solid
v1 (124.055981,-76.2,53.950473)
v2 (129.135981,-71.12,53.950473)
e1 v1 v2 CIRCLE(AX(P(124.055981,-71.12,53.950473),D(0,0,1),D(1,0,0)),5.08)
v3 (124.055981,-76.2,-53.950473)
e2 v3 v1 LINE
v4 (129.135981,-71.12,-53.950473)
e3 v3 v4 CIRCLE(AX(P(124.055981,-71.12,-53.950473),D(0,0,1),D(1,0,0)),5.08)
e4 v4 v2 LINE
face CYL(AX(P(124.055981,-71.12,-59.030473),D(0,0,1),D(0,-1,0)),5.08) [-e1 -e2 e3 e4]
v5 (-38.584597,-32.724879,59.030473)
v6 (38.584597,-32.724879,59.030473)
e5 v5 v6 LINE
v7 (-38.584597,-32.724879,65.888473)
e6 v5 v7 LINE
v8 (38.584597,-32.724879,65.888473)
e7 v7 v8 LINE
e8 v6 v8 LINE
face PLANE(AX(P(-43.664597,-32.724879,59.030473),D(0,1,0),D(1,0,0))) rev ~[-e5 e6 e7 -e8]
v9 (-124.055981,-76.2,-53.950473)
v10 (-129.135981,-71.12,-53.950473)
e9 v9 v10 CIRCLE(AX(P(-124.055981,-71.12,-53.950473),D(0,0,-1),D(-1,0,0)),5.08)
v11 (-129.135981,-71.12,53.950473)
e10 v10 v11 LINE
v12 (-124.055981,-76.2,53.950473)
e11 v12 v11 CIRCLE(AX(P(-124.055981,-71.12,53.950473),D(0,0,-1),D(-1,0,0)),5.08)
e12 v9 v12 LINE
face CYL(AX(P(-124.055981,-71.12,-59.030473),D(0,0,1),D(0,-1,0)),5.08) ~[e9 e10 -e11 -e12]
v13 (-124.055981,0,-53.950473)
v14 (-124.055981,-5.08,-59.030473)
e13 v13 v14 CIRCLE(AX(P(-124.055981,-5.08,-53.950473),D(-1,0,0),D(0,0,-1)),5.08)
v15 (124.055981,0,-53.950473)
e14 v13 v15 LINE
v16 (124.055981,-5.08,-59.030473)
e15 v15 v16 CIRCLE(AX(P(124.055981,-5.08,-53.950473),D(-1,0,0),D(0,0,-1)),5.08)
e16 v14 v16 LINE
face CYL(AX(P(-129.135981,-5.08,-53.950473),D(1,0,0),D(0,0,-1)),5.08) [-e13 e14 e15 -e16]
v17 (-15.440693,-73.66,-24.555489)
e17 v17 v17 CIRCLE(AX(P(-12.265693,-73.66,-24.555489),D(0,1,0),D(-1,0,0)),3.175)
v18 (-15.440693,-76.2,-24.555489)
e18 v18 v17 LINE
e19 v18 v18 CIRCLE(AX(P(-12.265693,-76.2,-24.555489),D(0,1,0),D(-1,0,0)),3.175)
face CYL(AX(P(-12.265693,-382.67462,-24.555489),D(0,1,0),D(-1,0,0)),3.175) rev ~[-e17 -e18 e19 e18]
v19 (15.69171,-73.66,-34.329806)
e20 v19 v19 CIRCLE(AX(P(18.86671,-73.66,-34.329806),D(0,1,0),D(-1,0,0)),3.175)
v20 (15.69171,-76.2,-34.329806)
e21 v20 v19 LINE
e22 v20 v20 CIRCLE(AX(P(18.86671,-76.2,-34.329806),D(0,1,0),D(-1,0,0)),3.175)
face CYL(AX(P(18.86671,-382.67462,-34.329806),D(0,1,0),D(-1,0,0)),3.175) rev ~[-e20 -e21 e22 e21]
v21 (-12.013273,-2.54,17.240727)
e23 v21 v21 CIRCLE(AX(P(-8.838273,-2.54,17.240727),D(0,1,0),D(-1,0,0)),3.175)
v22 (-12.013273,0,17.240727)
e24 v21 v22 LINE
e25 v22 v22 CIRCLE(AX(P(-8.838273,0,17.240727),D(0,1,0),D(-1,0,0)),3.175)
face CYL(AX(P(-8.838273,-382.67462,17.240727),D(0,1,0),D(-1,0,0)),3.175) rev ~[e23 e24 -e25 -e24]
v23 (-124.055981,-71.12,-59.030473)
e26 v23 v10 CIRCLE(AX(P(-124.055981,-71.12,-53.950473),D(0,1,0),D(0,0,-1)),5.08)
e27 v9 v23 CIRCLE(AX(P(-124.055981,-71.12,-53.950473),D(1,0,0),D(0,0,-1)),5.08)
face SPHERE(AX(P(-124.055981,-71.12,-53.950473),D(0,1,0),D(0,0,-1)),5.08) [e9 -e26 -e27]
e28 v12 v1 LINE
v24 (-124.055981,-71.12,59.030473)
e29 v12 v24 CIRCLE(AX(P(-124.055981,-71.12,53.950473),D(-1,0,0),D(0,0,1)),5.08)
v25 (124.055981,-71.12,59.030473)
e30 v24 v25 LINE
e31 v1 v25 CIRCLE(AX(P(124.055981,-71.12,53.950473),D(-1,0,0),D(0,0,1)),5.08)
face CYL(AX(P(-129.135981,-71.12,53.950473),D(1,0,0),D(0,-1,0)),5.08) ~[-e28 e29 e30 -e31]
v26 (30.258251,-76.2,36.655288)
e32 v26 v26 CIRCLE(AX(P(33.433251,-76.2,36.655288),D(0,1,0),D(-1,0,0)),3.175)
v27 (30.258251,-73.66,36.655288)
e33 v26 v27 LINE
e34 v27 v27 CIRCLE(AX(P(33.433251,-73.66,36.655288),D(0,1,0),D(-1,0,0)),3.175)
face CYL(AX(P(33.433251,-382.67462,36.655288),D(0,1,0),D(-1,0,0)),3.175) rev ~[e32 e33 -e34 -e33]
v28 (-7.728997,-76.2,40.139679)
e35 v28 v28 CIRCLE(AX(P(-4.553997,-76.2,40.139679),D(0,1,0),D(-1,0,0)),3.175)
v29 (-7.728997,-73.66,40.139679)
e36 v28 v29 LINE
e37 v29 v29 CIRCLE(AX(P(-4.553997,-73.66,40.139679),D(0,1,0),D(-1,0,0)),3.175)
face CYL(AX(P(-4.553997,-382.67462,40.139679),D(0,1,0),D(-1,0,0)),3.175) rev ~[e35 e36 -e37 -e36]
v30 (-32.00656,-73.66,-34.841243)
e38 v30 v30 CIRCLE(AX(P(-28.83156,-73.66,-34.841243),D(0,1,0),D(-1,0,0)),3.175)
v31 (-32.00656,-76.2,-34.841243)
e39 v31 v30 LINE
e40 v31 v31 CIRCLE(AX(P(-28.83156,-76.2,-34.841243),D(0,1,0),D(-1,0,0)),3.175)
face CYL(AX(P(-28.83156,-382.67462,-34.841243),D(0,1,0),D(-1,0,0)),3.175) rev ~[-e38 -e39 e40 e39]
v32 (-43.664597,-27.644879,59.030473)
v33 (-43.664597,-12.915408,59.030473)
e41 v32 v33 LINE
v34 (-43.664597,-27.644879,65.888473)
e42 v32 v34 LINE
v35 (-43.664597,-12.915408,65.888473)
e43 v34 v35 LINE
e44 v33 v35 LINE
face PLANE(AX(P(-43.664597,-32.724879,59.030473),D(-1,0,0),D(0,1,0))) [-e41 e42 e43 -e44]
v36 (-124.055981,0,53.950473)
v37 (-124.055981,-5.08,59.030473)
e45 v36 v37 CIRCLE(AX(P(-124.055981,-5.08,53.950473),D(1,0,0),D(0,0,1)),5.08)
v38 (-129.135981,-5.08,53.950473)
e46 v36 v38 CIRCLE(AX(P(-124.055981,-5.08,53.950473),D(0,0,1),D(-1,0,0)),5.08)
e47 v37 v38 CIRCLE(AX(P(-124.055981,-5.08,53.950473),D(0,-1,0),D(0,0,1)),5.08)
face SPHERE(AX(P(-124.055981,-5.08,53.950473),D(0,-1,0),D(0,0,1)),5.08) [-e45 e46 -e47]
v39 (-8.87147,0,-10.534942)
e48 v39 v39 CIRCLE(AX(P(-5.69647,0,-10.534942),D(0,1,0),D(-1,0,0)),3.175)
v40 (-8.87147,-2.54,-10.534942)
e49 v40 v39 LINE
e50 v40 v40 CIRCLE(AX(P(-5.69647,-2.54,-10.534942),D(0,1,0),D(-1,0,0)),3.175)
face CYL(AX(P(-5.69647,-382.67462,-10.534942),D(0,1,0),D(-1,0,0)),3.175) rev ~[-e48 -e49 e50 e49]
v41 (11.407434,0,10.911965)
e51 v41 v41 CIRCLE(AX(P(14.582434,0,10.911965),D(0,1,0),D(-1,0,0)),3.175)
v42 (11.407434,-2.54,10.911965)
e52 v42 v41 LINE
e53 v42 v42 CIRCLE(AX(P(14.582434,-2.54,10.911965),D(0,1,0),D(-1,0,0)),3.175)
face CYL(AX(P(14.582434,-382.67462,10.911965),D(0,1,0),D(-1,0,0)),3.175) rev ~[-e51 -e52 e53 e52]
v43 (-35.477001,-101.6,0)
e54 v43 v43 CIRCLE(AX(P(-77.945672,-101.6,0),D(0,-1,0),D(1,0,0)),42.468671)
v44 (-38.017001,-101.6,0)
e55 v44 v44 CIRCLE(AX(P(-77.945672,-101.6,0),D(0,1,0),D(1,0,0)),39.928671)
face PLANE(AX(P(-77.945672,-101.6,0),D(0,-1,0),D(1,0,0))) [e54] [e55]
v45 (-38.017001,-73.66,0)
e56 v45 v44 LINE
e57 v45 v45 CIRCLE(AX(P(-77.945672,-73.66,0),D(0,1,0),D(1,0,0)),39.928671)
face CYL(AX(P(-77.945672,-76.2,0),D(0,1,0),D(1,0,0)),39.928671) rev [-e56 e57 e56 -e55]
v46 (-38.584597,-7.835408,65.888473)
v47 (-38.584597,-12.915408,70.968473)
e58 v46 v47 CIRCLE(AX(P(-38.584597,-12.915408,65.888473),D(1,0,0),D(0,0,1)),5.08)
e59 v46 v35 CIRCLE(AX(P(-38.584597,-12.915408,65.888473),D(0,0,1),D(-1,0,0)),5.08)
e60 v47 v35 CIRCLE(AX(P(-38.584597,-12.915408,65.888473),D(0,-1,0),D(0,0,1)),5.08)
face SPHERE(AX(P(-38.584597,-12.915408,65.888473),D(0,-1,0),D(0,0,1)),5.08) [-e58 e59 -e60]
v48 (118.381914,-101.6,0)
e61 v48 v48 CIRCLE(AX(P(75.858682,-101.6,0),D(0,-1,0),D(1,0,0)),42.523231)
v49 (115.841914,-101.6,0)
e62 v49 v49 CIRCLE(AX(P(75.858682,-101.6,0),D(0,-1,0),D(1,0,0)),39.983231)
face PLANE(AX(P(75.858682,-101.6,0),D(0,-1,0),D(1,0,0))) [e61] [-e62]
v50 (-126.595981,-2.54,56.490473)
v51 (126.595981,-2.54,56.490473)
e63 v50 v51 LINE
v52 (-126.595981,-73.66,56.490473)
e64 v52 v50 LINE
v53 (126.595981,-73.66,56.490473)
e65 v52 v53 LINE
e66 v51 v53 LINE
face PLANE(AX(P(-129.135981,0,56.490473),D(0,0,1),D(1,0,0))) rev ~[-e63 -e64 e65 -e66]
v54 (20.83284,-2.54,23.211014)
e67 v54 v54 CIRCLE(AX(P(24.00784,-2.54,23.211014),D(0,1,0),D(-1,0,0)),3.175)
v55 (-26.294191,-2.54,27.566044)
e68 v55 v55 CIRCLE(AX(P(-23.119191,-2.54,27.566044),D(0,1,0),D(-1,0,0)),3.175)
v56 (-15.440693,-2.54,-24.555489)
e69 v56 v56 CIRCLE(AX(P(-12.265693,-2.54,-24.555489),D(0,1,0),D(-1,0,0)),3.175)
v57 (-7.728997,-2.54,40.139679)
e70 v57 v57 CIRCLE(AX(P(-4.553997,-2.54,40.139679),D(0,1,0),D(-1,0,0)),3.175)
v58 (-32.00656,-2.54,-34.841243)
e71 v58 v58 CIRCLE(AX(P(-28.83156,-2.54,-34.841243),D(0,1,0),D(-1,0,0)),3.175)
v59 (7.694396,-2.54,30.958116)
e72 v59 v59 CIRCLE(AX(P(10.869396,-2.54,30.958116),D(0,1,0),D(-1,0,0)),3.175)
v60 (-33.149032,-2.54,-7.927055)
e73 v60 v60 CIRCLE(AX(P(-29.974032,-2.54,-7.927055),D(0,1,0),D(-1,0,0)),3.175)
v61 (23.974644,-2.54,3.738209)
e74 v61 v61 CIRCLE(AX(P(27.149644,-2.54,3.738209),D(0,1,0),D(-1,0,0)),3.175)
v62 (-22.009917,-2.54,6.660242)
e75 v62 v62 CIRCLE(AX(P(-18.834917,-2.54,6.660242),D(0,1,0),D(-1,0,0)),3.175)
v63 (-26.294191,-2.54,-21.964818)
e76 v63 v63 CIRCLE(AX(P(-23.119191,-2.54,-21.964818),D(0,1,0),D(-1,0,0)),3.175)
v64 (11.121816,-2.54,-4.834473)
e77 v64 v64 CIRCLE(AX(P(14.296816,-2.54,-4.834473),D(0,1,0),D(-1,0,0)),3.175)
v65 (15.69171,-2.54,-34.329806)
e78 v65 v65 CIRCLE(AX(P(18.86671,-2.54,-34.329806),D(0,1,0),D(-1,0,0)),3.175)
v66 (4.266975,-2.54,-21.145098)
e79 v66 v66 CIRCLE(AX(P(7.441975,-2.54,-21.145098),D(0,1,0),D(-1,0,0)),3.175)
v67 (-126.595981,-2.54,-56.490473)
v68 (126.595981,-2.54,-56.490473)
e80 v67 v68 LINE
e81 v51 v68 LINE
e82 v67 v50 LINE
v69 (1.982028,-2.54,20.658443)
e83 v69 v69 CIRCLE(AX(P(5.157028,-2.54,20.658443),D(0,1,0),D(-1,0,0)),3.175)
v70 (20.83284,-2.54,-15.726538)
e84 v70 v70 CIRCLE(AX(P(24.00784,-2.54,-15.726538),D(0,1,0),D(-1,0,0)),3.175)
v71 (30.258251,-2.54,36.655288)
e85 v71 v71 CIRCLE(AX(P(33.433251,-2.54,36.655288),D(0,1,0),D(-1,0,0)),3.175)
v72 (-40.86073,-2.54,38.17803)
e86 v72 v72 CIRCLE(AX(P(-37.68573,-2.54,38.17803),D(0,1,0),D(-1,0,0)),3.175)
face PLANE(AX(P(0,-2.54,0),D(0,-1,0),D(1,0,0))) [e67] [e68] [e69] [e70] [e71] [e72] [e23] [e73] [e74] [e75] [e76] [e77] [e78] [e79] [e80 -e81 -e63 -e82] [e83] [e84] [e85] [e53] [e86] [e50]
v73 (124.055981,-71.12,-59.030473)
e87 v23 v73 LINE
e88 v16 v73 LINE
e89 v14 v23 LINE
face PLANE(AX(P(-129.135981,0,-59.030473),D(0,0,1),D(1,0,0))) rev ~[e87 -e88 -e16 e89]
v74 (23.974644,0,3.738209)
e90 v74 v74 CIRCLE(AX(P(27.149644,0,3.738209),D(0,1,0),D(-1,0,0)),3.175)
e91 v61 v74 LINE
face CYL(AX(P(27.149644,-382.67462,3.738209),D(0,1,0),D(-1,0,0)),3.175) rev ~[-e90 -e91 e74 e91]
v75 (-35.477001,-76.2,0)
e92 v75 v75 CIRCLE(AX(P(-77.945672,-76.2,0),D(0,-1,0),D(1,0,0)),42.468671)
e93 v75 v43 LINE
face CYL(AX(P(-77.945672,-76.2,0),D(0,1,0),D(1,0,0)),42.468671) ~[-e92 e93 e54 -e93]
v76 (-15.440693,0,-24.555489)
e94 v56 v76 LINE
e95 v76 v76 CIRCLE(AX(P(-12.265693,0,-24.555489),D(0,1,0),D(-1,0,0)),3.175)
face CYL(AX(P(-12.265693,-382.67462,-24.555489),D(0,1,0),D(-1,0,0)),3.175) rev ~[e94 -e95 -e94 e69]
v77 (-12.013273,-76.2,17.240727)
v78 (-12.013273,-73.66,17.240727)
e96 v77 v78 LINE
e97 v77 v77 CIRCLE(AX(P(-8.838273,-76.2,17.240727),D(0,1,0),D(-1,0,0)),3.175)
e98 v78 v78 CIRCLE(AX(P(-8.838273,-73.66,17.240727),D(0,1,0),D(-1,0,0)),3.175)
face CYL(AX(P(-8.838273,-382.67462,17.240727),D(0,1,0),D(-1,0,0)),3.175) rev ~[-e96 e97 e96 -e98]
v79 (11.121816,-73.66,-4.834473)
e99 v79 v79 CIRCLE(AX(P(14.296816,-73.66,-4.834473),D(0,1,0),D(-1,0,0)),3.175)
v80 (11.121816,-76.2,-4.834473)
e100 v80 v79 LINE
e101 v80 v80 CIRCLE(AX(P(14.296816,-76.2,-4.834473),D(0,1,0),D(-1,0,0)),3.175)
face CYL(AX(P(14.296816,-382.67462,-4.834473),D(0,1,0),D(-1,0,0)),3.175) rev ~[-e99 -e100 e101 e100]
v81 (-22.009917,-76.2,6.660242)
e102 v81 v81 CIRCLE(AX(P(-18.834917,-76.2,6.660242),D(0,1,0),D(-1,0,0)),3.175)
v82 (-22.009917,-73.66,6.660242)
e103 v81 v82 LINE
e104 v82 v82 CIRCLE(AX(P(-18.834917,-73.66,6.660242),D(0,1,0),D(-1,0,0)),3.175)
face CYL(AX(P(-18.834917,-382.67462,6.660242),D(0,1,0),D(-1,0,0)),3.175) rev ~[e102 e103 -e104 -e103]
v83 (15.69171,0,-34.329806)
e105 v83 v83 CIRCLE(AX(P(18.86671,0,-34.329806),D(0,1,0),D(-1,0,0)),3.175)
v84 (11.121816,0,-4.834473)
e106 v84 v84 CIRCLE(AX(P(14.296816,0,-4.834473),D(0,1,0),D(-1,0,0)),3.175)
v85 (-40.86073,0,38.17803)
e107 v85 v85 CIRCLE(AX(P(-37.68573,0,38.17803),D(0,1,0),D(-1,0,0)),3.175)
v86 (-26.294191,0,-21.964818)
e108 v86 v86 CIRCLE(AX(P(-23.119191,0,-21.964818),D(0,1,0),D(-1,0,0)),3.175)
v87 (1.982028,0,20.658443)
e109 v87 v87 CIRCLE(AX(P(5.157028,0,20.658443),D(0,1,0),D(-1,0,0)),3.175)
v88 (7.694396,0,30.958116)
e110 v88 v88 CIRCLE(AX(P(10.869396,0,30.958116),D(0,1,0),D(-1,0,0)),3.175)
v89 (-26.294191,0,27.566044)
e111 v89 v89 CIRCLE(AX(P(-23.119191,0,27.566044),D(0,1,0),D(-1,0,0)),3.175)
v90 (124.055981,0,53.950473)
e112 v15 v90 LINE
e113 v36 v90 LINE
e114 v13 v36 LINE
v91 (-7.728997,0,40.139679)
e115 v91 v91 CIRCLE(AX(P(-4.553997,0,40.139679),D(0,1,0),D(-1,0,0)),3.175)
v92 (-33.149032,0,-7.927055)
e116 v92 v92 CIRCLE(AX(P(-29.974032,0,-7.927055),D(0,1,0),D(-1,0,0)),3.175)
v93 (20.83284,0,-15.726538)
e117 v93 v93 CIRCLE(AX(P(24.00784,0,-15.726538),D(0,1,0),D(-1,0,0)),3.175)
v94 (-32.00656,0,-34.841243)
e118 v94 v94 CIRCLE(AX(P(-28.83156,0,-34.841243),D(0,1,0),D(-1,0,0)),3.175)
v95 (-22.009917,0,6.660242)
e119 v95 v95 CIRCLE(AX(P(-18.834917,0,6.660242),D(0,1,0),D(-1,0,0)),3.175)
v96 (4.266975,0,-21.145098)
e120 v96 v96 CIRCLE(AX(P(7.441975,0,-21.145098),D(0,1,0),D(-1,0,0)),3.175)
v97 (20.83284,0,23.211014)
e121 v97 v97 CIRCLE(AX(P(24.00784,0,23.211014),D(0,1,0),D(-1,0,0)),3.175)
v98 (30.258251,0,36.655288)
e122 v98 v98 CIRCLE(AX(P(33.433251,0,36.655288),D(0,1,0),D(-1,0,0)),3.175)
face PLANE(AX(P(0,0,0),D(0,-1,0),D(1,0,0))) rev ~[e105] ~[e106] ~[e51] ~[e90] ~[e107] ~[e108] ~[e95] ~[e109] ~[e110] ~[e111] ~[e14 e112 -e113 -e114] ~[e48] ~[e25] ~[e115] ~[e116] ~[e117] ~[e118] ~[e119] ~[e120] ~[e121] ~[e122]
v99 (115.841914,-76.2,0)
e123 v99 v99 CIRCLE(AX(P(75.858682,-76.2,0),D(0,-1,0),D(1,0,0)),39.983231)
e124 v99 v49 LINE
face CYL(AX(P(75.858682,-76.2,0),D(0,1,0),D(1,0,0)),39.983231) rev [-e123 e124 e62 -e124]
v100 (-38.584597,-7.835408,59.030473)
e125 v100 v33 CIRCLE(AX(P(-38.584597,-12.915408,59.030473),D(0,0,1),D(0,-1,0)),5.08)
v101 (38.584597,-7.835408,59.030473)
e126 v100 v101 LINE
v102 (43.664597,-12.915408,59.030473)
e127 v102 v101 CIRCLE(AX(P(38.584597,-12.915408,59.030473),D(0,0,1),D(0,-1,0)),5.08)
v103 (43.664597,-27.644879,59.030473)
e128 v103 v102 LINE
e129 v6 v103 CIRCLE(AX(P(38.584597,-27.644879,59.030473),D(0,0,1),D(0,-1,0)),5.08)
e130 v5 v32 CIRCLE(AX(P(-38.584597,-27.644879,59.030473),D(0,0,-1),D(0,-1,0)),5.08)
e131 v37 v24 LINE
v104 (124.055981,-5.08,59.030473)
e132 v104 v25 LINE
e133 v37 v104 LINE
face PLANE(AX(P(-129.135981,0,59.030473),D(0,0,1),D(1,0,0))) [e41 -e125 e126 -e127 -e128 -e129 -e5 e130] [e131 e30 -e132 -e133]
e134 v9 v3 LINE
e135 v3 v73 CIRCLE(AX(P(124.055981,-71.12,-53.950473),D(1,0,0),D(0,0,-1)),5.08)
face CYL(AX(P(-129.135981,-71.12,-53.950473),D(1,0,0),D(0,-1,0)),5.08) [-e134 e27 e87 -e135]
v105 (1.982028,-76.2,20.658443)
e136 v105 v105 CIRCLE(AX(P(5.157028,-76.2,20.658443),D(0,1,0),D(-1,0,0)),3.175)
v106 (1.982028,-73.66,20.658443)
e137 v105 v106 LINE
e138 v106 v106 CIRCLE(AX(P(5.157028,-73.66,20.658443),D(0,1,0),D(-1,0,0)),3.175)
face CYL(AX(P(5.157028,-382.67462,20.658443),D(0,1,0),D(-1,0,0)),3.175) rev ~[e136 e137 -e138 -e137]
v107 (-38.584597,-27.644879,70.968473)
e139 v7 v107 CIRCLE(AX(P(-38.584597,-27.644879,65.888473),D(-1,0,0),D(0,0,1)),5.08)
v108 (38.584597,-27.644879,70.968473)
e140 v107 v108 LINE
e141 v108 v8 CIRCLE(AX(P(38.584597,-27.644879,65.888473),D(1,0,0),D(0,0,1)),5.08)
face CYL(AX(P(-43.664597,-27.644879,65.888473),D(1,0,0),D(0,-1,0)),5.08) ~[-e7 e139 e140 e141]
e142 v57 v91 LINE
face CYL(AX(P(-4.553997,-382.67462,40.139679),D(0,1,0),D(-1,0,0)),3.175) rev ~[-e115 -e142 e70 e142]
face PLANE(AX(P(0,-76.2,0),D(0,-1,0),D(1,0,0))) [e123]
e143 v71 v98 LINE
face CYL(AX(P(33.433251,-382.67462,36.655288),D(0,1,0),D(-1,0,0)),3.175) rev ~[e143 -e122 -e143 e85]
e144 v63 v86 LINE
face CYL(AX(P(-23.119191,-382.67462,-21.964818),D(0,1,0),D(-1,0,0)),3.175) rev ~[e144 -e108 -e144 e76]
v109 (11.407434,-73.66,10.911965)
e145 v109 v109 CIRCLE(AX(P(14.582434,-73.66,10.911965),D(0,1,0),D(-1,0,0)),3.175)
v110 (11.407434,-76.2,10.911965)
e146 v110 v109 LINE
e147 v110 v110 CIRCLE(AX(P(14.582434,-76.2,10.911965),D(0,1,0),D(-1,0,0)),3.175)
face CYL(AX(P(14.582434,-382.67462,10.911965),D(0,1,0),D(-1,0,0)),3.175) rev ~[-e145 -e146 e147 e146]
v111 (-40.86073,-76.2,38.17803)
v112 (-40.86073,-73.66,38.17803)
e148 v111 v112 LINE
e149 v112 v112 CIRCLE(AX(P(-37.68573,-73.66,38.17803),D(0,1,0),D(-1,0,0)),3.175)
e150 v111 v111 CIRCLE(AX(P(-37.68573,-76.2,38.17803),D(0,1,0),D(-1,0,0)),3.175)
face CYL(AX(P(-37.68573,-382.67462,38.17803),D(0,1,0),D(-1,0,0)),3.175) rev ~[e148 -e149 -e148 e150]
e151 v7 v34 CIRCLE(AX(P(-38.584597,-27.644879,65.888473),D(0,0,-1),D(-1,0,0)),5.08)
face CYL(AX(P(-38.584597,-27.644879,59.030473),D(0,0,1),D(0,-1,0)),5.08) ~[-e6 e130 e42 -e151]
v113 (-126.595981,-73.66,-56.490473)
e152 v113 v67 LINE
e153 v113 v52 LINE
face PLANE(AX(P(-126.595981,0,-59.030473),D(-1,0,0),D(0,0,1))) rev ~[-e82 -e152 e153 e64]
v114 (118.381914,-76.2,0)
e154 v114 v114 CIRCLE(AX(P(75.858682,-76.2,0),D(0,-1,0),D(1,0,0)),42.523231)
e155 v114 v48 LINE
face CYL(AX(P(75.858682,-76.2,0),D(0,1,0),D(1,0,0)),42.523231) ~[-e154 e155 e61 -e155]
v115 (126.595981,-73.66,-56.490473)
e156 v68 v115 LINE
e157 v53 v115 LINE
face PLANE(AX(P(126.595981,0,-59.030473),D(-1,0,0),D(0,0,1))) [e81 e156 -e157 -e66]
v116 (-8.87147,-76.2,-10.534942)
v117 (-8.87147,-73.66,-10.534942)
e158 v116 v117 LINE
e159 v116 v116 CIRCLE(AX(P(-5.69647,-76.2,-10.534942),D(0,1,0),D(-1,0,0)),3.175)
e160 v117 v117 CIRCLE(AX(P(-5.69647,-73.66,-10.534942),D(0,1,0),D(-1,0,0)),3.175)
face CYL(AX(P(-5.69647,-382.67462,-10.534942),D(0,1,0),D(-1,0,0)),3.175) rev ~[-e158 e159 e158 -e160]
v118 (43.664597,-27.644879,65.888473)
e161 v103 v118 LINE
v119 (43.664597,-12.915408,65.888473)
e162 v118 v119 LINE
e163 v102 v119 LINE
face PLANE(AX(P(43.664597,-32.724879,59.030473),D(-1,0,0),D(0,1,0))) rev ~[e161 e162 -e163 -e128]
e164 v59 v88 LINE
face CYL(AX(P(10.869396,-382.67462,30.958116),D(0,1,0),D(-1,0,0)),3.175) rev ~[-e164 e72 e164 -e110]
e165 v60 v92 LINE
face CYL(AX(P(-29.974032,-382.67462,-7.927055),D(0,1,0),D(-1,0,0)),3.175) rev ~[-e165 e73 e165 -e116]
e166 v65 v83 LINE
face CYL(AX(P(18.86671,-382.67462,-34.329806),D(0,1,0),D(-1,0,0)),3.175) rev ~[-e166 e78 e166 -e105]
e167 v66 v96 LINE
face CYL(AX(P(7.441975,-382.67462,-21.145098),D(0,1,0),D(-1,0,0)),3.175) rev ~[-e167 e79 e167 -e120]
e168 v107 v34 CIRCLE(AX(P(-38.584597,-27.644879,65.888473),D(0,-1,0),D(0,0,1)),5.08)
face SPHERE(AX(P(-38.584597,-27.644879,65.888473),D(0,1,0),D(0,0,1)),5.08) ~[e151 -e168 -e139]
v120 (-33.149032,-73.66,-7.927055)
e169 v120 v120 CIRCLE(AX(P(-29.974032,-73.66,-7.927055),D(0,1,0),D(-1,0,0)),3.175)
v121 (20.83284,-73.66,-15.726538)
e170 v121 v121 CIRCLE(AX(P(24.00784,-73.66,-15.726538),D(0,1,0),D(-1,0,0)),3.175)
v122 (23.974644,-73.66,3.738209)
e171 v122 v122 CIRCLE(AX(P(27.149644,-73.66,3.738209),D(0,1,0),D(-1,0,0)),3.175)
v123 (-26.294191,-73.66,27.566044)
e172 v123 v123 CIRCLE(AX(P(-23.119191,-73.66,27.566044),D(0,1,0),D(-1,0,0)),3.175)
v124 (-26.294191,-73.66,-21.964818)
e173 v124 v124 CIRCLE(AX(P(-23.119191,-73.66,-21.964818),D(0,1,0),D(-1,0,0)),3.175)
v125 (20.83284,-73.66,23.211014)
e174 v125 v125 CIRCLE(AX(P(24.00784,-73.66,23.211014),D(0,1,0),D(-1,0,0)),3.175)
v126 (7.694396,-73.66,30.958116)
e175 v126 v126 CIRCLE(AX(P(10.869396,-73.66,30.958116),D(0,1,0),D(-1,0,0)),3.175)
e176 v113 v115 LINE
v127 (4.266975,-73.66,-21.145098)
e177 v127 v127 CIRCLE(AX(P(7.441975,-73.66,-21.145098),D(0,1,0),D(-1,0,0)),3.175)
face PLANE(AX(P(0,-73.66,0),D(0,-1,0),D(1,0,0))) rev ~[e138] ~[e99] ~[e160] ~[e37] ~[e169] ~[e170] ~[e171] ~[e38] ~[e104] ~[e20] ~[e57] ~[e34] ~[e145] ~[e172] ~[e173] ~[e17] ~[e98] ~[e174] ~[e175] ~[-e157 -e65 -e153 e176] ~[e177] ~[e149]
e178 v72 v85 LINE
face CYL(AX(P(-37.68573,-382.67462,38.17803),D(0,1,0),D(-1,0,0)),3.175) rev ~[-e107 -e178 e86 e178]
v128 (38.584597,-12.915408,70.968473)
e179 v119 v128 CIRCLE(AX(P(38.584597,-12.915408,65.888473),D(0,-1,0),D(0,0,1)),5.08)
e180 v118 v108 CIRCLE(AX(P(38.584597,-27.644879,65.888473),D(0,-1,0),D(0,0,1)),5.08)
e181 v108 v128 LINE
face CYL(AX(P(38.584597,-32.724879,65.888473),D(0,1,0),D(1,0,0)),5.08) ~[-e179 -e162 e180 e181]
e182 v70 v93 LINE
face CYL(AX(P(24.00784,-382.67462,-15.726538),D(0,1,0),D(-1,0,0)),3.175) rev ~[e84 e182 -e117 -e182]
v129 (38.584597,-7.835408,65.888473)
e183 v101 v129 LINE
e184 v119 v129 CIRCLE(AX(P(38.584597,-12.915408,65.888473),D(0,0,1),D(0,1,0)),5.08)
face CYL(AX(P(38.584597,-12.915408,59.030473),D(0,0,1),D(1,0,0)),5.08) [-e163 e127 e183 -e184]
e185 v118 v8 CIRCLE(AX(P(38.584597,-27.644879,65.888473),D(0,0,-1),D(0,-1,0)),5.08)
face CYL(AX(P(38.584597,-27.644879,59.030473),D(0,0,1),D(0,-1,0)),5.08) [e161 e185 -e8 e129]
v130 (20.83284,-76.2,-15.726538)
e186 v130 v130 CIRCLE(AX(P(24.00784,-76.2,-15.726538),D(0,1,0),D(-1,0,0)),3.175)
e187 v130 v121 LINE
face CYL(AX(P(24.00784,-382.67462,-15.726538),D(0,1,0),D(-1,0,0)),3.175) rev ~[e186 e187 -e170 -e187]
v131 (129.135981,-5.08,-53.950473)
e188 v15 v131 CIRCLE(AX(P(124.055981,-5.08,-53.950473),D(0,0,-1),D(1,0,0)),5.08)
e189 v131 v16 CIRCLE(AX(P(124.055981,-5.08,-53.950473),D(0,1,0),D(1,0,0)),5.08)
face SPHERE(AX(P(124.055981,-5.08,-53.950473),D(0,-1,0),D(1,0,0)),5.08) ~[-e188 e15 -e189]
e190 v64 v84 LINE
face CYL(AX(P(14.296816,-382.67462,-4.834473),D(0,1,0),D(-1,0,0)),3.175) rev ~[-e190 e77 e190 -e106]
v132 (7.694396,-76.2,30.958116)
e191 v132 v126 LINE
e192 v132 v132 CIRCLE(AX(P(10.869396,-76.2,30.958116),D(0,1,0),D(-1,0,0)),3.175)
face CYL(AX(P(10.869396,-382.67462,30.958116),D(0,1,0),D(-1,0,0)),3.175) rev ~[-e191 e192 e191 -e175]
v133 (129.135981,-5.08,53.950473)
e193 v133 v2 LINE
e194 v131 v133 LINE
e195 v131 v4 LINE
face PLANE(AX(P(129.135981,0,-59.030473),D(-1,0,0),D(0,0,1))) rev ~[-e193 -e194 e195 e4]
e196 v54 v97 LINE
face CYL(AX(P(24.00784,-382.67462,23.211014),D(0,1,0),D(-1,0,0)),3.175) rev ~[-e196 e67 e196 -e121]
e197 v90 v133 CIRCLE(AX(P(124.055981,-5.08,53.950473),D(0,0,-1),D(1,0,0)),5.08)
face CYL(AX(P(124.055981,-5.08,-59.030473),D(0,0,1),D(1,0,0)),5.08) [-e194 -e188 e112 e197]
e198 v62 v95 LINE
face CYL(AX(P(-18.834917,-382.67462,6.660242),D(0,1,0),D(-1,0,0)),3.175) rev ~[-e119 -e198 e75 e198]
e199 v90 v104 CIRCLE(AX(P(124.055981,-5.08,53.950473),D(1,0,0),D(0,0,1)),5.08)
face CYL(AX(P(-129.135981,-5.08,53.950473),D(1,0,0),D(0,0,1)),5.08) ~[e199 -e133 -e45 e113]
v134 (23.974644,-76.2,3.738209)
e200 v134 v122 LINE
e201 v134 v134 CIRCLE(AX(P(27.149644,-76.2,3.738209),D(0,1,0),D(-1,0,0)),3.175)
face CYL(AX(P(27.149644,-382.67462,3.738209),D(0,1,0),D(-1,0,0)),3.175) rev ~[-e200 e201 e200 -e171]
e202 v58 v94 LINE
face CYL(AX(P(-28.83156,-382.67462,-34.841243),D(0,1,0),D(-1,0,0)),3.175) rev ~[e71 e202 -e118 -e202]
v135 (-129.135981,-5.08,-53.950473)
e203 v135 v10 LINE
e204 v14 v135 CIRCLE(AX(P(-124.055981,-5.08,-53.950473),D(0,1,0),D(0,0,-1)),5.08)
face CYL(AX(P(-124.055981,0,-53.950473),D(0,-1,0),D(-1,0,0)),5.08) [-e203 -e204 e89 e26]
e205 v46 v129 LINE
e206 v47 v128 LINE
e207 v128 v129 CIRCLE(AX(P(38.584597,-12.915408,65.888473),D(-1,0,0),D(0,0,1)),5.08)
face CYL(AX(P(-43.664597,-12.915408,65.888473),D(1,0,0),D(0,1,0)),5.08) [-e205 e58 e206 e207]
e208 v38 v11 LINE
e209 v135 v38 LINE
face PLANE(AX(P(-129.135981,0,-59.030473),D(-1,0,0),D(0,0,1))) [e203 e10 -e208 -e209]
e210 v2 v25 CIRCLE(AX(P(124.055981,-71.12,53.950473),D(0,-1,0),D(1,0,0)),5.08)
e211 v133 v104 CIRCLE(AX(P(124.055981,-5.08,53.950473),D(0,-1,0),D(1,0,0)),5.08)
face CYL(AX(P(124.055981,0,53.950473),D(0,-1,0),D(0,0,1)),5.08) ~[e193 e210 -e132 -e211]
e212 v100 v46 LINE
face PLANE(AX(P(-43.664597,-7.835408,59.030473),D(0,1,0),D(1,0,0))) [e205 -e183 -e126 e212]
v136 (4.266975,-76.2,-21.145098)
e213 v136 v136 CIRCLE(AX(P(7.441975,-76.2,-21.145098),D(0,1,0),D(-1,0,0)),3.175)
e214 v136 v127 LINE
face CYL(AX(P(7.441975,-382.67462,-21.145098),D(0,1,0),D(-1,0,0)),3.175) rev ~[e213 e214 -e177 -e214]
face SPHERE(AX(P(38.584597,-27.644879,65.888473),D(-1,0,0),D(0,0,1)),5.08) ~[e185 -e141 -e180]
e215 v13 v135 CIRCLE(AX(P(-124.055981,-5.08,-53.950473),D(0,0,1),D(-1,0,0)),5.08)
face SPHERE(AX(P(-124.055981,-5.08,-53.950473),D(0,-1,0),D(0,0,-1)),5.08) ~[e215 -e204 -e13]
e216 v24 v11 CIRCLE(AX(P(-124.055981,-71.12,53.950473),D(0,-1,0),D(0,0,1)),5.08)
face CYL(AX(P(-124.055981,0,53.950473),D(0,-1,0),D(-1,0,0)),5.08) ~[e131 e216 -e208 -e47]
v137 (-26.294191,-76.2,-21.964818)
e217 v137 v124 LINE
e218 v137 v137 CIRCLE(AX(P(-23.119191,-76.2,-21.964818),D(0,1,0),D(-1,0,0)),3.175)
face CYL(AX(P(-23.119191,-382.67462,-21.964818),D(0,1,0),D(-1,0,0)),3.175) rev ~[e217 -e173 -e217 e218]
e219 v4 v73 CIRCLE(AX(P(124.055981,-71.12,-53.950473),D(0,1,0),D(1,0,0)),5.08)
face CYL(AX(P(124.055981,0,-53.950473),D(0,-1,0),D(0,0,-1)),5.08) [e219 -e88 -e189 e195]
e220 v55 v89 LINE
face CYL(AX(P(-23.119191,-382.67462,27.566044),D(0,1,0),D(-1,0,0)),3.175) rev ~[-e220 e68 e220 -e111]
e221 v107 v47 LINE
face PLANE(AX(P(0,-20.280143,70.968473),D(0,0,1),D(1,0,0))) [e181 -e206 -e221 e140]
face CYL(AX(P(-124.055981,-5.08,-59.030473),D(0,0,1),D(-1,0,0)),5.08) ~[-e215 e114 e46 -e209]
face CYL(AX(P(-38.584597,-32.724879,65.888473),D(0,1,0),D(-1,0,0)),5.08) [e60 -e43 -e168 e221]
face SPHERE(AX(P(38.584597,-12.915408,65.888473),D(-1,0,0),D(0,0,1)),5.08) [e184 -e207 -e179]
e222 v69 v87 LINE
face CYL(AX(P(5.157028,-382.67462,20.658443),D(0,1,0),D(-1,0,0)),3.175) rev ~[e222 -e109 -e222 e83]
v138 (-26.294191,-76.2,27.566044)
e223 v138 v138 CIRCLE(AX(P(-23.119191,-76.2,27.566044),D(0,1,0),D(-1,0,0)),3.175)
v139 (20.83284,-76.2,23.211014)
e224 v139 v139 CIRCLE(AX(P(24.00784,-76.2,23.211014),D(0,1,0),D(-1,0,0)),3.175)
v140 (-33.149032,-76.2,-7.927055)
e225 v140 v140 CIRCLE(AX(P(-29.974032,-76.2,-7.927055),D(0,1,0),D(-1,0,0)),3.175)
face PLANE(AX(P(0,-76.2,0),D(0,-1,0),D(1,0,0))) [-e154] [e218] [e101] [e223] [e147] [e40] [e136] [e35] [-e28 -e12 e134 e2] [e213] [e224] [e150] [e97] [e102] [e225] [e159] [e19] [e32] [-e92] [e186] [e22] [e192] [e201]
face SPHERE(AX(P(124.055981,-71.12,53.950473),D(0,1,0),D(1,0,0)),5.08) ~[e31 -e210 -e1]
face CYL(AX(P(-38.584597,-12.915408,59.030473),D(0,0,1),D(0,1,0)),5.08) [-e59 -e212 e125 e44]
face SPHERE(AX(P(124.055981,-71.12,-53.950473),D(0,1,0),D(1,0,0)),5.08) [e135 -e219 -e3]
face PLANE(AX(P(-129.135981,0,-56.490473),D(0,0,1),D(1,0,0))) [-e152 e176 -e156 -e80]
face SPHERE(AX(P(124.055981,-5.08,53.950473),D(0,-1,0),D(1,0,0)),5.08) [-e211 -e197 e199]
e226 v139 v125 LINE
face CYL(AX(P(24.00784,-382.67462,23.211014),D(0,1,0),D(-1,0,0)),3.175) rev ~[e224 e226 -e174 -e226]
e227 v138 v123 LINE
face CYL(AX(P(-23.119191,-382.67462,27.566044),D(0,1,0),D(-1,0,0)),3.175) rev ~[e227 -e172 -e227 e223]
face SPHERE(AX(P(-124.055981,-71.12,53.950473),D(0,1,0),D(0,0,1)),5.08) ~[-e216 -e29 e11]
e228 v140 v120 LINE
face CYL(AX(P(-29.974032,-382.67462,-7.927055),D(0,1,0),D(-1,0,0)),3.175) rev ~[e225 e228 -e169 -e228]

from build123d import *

# Parameters (mm, degrees)
F0_W        = 258.2719624043
F0_H        = 118.0609464645
F1_DEPTH    = 76.2
F2_R        = 42.468670908
F3_DEPTH    = 25.4
F4_T        = -2.54
F5_R        = 42.5232314901
F6_DEPTH    = 25.4
F7_T        = 2.54
F7_T3_DEPTH = 76.2
F7_T5_DEPTH = 258.2719624043
F7_T7_DEPTH = 118.0609464645
F8_W        = 87.3291939497
F8_H        = 24.8894710094
F9_DEPTH    = 11.938
F10_R       = 5.08
F12_D       = 6.35
F14_D       = 6.35


# Not quite as in the source:
# - a shell that OpenCascade refuses in one call is made with other operations: the cavity is built on its own and cut out


with BuildPart() as f1:
    # F0 (on Front) → F1 (new body)
    with BuildSketch(Plane.XZ):
        Rectangle(F0_W, F0_H)
    extrude(amount=F1_DEPTH)

    # F2 (on face) → F3 (join)
    with BuildSketch(Plane.XZ.offset(76.2)):
        with Locations((-77.9456719756, 0)):
            Circle(F2_R)
    extrude(amount=F3_DEPTH)

    # F4
    f4_openings = [f1.faces().sort_by_distance(p)[0] for p in [
        (-77.945672, -101.6, 0),
    ]]
    offset(amount=F4_T, openings=f4_openings, kind=Kind.INTERSECTION)

    # F5 (on face) → F6 (join)
    with BuildSketch(Plane.XZ.offset(76.2)):
        with Locations((75.858682394, 0)):
            Circle(F5_R)
    extrude(amount=F6_DEPTH)

    # F7: shell of thickness 2.54, made by hand


with BuildPart() as f7_core1:
    # F7_t2: copy of F1
    add(f1.part)

    # the walls: a layer under each face that stays
    f7_faces = [f7_core1.faces().sort_by_distance(p)[0] for p in [
        (0, -38.1, 56.4904732323),
        (126.5959812021, -38.1, 0),
        (0, -73.66, 0),
        (-126.5959812021, -38.1, 0),
        (0, -2.54, 0),
        (0, -38.1, -56.4904732323),
        (-117.8743428837, -87.63, 0),
        (-106.2581192476, -101.6, -28.312447272),
        (-120.4143428837, -88.9, 0),
        (0, -76.2, 0),
        (0, -38.1, 59.0304732323),
        (129.1359812021, -38.1, 0),
        (-129.1359812021, -38.1, 0),
        (0, -38.1, -59.0304732323),
        (33.3354509039, -88.9, 0),
        (0, 0, 0),
    ]]
    thicken(f7_faces, amount=-F7_T, mode=Mode.SUBTRACT)

    # F7_s4 → F7_t3 (cut)
    with BuildSketch(Plane.XZ):
        Polygon((126.5705812021, 56.4650732323), (126.5959812021, 59.0304732323), (129.1359812021, 59.0304732323), (129.1359812021, 56.4904732323), align=None)
        Polygon((-126.5705812021, 56.4650732323), (-126.5959812021, 59.0304732323), (-129.1359812021, 59.0304732323), (-129.1359812021, 56.4904732323), align=None)
        Polygon((126.5705812021, -56.4650732323), (129.1359812021, -56.4904732323), (129.1359812021, -59.0304732323), (126.5959812021, -59.0304732323), align=None)
        Polygon((-126.5705812021, -56.4650732323), (-129.1359812021, -56.4904732323), (-129.1359812021, -59.0304732323), (-126.5959812021, -59.0304732323), align=None)
    extrude(amount=F7_T3_DEPTH, mode=Mode.SUBTRACT)

    # F7_s6 → F7_t5 (cut)
    with BuildSketch(Plane.YZ.offset(-129.1359812021)):
        Polygon((-73.6346, 56.4650732323), (-73.66, 59.0304732323), (-76.2, 59.0304732323), (-76.2, 56.4904732323), align=None)
        Polygon((-2.5654, 56.4650732323), (-2.54, 59.0304732323), (0, 59.0304732323), (0, 56.4904732323), align=None)
        Polygon((-73.6346, -56.4650732323), (-76.2, -56.4904732323), (-76.2, -59.0304732323), (-73.66, -59.0304732323), align=None)
        Polygon((-2.5654, -56.4650732323), (0, -56.4904732323), (0, -59.0304732323), (-2.54, -59.0304732323), align=None)
    extrude(amount=F7_T5_DEPTH, mode=Mode.SUBTRACT)

    # F7_s8 → F7_t7 (cut)
    with BuildSketch(Plane.XY.offset(-59.0304732323)):
        Polygon((126.5705812021, -73.6346), (129.1359812021, -73.66), (129.1359812021, -76.2), (126.5959812021, -76.2), align=None)
        Polygon((126.5705812021, -2.5654), (129.1359812021, -2.54), (129.1359812021, 0), (126.5959812021, 0), align=None)
        Polygon((-126.5705812021, -73.6346), (-126.5959812021, -76.2), (-129.1359812021, -76.2), (-129.1359812021, -73.66), align=None)
        Polygon((-126.5705812021, -2.5654), (-129.1359812021, -2.54), (-129.1359812021, 0), (-126.5959812021, 0), align=None)
    extrude(amount=F7_T7_DEPTH, mode=Mode.SUBTRACT)

    # F7_s9 → F7_t10 (revolve, cut)
    with BuildSketch(Plane.XY):
        Polygon((-35.4516010676, -76.2254), (-38.0170010676, -76.2), (-38.0170010676, -73.66), (-35.4770010676, -73.66), align=None)
    revolve(axis=Axis((-77.9456719756, -76.2, 0), (0, -1, 0)), mode=Mode.SUBTRACT)

    # F7_s11 → F7_t12 (revolve, cut)
    with BuildSketch(Plane.XY):
        Polygon((118.4073138841, -76.2254), (118.3819138841, -73.66), (115.8419138841, -73.66), (115.8419138841, -76.2), align=None)
    revolve(axis=Axis((75.858682394, -76.2, 0), (0, -1, 0)), mode=Mode.SUBTRACT)


with BuildPart() as f1_1:
    add(f1.part)

    # what is left inside the walls is the cavity
    f7_cavity = [f7_core1.part.solids().sort_by_distance(p)[0] for p in [
        (35.900851, -93.133333, 0),
    ]]
    add(f7_cavity, mode=Mode.SUBTRACT)

    # F8 (on face) → F9 (join)
    with BuildSketch(Plane.XY.offset(59.0304732323)):
        with Locations((0, -20.2801432461)):
            Rectangle(F8_W, F8_H)
    extrude(amount=F9_DEPTH)

    # F10
    f10_edges = [f1_1.edges().sort_by_distance(p)[0] for p in [
        (-129.135981, -38.1, 59.030473),
        (-129.135981, -38.1, -59.030473),
        (129.135981, -38.1, 59.030473),
        (129.135981, -38.1, -59.030473),
        (129.135981, -76.2, 0),
        (0, -76.2, 59.030473),
        (0, -76.2, -59.030473),
        (129.135981, 0, 0),
        (0, 0, 59.030473),
        (0, 0, -59.030473),
        (-129.135981, 0, 0),
        (-129.135981, -76.2, 0),
        (-43.664597, -20.280143, 70.968473),
        (0, -32.724879, 70.968473),
        (0, -7.835408, 70.968473),
        (43.664597, -20.280143, 70.968473),
        (-43.664597, -32.724879, 64.999473),
        (-43.664597, -7.835408, 64.999473),
        (43.664597, -32.724879, 64.999473),
        (43.664597, -7.835408, 64.999473),
    ]]
    fillet(f10_edges, radius=F10_R)

    # F12 (through all)
    with Locations(Plane.XZ.offset(76.2)):
        with Locations((-4.5539974235, 40.1396788657)):
            Hole(F12_D / 2)

    # F14 (through all)
    with Locations(Plane.XZ.offset(76.2)):
        with Locations((-37.6857295632, 38.1780304015), (-23.1191907078, 27.56604366), (10.8693959191, 30.9581160545), (33.4332510829, 36.6552881896), (24.007840082, 23.2110135257), (-8.8382726535, 17.2407273203), (5.1570278592, 20.6584427506), (-18.8349168748, 6.6602416337), (14.5824337378, 10.9119648114), (27.149643749, 3.7382091396), (24.007840082, -15.726538375), (14.2968157306, -4.8344726674), (-29.9740321934, -7.9270545393), (-5.6964703836, -10.5349421501), (-23.1191907078, -21.9648182392), (-12.2656933963, -24.5554894209), (-28.8315601647, -34.8412431777), (7.4419751763, -21.1450979114), (18.8667103648, -34.3298055232)):
            Hole(F14_D / 2)


solid = f1_1.part
